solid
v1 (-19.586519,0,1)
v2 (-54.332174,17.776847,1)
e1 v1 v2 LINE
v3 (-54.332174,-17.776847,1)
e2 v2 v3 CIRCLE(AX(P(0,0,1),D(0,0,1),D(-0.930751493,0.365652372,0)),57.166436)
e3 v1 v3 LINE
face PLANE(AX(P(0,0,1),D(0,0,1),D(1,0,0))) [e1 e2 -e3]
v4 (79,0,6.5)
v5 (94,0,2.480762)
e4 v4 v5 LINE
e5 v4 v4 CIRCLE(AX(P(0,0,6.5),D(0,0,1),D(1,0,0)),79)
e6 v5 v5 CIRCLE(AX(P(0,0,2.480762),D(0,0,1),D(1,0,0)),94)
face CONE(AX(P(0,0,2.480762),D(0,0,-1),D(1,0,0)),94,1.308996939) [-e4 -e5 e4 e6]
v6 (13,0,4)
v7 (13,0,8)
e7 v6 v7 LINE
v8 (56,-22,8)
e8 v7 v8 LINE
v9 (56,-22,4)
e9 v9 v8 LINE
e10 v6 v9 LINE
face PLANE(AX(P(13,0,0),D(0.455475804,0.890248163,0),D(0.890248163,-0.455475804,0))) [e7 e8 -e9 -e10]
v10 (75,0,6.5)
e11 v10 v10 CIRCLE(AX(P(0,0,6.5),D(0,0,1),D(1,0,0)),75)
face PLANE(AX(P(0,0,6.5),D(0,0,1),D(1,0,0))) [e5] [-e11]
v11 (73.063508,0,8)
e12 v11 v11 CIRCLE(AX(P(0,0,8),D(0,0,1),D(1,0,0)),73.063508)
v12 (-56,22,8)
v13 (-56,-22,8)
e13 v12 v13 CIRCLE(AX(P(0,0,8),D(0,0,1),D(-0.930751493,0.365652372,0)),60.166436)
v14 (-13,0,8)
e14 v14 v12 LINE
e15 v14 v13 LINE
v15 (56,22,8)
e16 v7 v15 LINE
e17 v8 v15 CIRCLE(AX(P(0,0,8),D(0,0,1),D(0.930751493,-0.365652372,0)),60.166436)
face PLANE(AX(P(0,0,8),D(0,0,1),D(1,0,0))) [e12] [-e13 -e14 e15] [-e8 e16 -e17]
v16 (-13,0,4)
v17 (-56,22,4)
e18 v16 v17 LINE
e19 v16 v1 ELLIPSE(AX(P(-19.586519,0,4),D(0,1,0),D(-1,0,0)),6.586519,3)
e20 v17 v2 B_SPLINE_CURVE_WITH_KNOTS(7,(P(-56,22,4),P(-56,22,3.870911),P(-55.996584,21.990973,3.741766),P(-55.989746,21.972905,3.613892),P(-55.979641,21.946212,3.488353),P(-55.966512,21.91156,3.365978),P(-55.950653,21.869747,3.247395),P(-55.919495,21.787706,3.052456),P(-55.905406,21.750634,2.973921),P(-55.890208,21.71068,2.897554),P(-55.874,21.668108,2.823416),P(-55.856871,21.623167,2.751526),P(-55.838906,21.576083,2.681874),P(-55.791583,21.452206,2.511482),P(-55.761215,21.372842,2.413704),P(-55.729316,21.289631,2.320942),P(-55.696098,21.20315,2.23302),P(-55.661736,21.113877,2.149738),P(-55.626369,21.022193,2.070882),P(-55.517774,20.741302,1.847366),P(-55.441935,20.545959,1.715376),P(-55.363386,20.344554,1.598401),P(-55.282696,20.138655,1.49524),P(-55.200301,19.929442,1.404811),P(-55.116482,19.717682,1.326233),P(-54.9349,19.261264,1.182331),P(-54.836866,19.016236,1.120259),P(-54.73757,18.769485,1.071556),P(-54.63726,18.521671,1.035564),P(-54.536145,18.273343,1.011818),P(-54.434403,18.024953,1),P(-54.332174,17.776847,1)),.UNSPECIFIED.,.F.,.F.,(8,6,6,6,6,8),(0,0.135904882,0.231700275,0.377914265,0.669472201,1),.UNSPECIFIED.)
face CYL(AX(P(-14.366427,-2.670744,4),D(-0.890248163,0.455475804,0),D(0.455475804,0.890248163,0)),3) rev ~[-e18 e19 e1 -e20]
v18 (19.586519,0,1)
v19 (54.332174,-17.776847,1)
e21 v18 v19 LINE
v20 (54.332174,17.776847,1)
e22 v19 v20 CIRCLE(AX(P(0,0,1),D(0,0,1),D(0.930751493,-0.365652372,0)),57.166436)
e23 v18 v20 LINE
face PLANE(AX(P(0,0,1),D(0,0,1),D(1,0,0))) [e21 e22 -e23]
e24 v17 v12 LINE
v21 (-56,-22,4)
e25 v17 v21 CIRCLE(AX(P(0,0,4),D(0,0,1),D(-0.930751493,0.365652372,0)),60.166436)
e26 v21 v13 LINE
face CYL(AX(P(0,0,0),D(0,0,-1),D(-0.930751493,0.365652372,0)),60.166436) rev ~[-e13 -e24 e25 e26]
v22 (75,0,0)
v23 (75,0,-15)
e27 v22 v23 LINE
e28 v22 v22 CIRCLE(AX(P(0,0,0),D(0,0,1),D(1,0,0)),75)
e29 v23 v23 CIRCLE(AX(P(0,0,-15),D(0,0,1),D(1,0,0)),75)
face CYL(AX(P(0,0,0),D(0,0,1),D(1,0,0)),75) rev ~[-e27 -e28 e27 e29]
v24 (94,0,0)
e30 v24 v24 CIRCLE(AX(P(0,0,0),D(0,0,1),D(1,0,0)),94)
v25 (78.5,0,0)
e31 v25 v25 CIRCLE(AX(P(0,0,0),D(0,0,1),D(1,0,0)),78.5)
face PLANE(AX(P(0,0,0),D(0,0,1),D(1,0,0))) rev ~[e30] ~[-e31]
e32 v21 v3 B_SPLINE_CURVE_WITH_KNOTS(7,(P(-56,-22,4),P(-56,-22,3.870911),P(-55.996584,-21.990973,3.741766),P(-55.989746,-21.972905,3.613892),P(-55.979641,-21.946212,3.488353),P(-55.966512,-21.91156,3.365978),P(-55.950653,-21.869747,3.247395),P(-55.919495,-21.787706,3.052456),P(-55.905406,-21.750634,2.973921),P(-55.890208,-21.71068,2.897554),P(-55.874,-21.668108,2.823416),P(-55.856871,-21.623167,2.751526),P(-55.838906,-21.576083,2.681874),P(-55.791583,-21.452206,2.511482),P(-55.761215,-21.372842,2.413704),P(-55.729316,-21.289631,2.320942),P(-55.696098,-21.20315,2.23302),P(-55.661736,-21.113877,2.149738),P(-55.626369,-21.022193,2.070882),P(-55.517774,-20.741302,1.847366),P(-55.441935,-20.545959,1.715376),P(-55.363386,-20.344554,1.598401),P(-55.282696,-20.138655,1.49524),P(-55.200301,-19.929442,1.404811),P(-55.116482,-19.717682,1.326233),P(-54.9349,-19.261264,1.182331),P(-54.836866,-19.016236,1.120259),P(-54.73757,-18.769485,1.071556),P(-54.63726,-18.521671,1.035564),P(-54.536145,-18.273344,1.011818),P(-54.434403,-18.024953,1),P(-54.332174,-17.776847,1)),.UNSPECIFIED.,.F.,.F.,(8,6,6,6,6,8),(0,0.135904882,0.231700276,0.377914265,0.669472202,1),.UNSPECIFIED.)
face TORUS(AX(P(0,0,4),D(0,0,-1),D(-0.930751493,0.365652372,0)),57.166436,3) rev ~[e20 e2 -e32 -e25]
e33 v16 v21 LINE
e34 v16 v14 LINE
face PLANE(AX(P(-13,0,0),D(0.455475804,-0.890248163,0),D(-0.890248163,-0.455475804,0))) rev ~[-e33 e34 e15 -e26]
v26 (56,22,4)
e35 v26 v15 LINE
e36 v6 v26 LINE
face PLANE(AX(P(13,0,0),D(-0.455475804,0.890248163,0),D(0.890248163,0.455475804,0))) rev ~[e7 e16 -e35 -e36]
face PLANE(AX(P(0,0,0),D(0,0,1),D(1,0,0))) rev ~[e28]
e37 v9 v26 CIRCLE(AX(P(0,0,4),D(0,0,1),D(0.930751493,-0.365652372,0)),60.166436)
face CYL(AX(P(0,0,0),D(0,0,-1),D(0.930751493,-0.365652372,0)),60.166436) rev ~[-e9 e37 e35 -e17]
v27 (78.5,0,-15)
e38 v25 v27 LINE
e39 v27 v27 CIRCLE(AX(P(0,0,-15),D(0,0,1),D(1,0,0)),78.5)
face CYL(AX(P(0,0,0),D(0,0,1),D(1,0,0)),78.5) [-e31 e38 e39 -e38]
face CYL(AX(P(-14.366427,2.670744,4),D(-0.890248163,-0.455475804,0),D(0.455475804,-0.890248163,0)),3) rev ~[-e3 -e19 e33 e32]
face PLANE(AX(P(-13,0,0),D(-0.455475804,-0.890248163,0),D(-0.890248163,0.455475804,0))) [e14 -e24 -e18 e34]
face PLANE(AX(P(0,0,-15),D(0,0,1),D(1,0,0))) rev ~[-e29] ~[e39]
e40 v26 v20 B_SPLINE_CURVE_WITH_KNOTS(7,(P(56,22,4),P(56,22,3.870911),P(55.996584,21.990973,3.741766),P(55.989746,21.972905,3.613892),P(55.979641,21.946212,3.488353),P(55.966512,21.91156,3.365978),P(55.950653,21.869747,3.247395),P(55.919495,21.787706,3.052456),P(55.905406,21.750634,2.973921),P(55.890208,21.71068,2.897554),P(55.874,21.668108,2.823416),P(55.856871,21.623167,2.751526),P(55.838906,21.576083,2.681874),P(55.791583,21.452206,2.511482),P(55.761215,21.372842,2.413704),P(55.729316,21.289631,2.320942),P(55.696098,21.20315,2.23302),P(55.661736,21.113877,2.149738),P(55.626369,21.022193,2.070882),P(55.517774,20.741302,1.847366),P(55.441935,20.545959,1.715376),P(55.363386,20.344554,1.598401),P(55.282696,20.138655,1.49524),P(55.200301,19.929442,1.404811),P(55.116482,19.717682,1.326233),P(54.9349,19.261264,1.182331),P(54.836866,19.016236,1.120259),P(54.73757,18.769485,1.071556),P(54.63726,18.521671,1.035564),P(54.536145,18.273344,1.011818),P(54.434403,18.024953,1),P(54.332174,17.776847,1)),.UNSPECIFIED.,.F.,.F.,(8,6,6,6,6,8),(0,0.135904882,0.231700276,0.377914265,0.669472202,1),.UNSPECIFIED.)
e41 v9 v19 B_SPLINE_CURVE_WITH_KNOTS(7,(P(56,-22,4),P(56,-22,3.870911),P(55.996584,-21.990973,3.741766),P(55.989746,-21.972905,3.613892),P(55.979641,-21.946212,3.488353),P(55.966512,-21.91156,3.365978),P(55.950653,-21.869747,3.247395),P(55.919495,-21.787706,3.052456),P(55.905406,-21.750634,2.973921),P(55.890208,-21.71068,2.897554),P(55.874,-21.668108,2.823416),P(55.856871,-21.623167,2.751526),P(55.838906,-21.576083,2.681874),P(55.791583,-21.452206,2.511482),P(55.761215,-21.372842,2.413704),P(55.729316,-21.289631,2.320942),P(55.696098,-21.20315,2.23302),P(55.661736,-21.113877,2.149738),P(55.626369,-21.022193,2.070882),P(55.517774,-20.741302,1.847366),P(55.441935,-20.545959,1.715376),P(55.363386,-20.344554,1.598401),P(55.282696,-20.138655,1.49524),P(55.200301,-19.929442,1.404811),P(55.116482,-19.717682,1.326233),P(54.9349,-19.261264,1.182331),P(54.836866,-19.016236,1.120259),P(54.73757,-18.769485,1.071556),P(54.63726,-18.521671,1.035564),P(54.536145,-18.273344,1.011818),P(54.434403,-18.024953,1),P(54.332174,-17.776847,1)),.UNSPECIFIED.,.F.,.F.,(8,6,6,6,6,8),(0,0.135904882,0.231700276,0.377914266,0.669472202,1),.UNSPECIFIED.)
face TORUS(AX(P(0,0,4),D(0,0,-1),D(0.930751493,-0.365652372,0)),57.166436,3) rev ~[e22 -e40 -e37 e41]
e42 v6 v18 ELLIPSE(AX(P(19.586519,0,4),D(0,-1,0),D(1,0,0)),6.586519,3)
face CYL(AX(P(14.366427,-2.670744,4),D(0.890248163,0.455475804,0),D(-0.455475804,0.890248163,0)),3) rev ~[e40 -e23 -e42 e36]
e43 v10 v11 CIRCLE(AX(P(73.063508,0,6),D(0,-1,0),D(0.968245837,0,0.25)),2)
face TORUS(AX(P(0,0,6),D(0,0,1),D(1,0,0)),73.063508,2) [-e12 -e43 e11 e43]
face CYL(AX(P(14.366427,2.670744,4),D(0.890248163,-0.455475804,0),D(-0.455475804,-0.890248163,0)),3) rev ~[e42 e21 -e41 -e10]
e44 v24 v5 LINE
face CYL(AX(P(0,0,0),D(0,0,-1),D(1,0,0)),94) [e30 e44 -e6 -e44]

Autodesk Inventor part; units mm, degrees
ref_plane "YZ Plane" through (0, 0, 0) normal (1, 0, 0) x (0, 1, 0)
ref_plane "XZ Plane" through (0, 0, 0) normal (0, 1, 0) x (-1, 0, 0)
ref_plane "XY Plane" through (0, 0, 0) normal (0, 0, 1) x (1, 0, 0)
sketch "Sketch1" plane through (0, 0, 0) normal (0, 0, 1) x (1, 0, 0)
  circle A0 centre (0, 0) radius 94
  circle A1 centre (0, 0) radius 75
  line L0 (-13, 0) -> (-56, 22)
  line L1 (-130, 0) -> (137, 0) construction
  line L2 (0, 131.4545) -> (0, -117) construction
  line L3 (-13, 0) -> (-56, -22)
  line L4 (0, -131.4545) -> (0, 117) construction
  arc A2 (-56, 22) -> (-56, -22) centre (0, 0) ccw
  line L5 (13, 0) -> (56, 22)
  line L6 (13, 0) -> (56, -22)
  arc A3 (56, -22) -> (56, 22) centre (0, 0) ccw
  circle A4 centre (0, 0) radius 78.5
  dimension "d0" = 188
  dimension "d6" = 150
  dimension "d16" = 157
extrude "Extrusion1" add sketch "Sketch1" along normal blind 6.5 contours A0 | A4
extrude "Extrusion3" add sketch "Sketch1" along normal blind 8 contours A1
fillet "Fillet2" radius 2 1 edges at (-75, 0, 8)
chamfer "Chamfer1" distance 15 angle 15 1 edges at (-94, 0, 6.5) measured on face at (-71.1692, 50.8207, 6.5)
extrude "Extrusion4" add sketch "Sketch1" along normal blind 1 contours L3 A2 L0 | L5 A3 L6
fillet "Fillet3" radius 3 6 edges at (-60.1664, 0, 1) (-34.5, 11, 1) (-34.5, -11, 1) (34.5, 11, 1) (34.5, -11, 1) (60.1664, 0, 1)
extrude "Extrusion5" add sketch "Sketch1" against normal blind 15 contours A4
properties part number "hatch"
